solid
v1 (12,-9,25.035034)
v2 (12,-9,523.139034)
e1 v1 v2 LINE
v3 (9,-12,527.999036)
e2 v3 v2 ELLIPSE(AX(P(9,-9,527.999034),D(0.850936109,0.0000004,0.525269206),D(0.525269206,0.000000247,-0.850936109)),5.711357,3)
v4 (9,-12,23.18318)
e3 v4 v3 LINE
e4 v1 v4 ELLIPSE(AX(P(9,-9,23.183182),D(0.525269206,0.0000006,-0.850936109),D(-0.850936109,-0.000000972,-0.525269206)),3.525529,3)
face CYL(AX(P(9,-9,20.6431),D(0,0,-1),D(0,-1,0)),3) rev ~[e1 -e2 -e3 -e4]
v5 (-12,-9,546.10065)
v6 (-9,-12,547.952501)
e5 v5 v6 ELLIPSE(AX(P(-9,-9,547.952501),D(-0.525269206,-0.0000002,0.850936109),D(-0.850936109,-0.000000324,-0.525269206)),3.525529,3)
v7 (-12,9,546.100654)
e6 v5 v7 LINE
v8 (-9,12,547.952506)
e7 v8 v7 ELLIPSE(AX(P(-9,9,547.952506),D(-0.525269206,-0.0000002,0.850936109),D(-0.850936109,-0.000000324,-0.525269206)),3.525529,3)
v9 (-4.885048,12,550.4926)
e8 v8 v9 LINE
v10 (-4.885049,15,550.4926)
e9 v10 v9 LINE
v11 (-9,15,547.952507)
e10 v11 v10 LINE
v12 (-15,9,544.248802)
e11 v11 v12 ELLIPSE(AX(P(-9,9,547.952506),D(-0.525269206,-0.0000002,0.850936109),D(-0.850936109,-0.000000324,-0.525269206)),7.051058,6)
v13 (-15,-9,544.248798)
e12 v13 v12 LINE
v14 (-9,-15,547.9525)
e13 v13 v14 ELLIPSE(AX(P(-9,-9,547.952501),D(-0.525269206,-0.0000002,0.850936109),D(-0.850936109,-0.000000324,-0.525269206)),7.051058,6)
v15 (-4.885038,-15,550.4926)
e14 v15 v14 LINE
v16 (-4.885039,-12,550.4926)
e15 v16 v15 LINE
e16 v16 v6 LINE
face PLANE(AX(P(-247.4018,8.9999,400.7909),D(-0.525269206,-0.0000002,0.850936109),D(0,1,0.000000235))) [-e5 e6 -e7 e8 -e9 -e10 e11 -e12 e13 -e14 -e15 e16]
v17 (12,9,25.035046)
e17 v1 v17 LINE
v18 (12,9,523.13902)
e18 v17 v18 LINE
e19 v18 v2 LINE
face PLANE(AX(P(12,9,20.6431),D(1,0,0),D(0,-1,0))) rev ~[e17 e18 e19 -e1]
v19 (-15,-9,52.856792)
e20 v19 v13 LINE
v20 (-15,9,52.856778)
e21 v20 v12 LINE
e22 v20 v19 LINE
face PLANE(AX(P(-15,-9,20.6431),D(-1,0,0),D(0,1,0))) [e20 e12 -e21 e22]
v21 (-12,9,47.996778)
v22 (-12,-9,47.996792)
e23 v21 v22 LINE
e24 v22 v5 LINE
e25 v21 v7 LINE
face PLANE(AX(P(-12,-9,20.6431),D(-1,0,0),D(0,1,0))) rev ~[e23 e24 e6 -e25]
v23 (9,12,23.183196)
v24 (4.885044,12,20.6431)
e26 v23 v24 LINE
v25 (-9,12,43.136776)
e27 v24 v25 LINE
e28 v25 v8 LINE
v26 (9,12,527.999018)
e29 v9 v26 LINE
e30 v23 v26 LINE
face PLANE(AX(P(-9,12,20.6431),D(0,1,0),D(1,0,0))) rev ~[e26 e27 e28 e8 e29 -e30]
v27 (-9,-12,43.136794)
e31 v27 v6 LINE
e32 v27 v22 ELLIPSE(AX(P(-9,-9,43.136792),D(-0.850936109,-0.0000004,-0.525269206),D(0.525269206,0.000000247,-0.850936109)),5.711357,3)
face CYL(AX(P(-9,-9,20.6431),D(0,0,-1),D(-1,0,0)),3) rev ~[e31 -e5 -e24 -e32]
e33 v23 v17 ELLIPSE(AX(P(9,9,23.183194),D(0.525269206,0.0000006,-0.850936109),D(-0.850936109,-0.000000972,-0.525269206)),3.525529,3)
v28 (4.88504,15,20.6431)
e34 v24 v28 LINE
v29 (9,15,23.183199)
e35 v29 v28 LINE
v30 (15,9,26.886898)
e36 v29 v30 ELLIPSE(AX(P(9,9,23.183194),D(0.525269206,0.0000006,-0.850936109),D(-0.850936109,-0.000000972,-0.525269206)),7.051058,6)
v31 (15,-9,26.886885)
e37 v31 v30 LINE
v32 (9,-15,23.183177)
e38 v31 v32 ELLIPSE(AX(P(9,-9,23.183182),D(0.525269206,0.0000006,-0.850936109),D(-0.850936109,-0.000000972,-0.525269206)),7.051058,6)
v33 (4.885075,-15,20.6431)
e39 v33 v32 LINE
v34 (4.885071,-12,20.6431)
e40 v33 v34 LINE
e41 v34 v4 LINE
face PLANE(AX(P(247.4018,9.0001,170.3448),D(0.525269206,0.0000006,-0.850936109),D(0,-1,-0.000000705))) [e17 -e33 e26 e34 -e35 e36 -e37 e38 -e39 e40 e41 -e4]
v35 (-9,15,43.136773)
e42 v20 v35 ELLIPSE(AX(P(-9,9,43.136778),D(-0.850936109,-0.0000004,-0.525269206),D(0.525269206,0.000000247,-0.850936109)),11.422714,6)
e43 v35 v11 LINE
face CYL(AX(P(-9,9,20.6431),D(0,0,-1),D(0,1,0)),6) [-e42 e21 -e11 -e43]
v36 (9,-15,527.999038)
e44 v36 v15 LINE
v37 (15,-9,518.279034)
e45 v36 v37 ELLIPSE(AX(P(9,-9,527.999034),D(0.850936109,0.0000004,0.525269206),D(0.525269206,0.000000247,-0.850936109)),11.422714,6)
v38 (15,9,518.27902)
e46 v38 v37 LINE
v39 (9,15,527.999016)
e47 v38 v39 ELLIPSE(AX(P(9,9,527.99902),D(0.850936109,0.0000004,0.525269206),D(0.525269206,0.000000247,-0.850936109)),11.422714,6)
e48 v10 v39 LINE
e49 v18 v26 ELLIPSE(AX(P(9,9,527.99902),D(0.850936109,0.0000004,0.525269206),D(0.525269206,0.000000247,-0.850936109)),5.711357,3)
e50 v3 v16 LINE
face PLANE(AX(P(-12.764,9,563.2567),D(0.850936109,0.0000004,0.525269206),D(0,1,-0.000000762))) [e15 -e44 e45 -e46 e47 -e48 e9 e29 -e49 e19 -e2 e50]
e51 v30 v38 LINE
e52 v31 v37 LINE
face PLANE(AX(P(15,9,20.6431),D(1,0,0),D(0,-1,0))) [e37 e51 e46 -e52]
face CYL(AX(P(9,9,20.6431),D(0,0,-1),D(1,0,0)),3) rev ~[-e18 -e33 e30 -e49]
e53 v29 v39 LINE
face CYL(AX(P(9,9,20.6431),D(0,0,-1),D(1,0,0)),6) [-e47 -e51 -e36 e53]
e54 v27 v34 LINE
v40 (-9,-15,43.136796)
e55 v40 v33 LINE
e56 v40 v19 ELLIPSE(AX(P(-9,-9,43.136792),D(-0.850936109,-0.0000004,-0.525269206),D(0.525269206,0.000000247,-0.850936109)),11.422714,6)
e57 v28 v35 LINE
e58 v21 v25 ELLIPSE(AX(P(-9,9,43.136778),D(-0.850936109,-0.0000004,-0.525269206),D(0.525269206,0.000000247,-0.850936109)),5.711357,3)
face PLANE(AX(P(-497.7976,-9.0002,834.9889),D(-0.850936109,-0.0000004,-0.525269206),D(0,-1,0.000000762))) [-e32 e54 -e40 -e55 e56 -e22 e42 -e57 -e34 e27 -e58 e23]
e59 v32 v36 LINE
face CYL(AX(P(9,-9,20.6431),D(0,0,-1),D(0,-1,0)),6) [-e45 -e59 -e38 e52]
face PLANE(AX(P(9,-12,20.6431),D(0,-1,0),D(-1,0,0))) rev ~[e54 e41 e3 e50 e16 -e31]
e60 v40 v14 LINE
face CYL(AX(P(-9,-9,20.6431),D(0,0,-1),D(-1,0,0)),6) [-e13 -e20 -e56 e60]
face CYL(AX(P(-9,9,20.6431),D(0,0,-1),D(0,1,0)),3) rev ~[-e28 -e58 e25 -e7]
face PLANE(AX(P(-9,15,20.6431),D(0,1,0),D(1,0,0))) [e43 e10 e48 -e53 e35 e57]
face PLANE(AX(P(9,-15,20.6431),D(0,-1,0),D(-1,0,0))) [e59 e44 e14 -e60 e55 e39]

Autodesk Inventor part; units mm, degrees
ref_plane "Start Plane" through (0, 0, 20.6431) normal (0, 0, 1) x (1, 0, 0)
ref_plane "End Plane" through (0, 0, 550.4926) normal (0, 0, 1) x (1, 0, 0)
sketch "Sketch" plane through (0, 0, 0) normal (0, 0, 1) x (1, 0, 0)
  line L0 (-15, -9) -> (-15, 9)
  line L1 (-9, 15) -> (9, 15)
  line L2 (15, 9) -> (15, -9)
  line L3 (9, -15) -> (-9, -15)
  arc A0 (-15, -9) -> (-9, -15) centre (-9, -9) ccw
  arc A1 (-9, 15) -> (-15, 9) centre (-9, 9) ccw
  arc A2 (15, 9) -> (9, 15) centre (9, 9) ccw
  arc A3 (9, -15) -> (15, -9) centre (9, -9) ccw
  arc A4 (-9, 12) -> (-12, 9) centre (-9, 9) ccw
  line L4 (-9, 12) -> (9, 12)
  arc A5 (12, 9) -> (9, 12) centre (9, 9) ccw
  line L5 (12, 9) -> (12, -9)
  arc A6 (9, -12) -> (12, -9) centre (9, -9) ccw
  line L6 (9, -12) -> (-9, -12)
  arc A7 (-12, -9) -> (-9, -12) centre (-9, -9) ccw
  line L7 (-12, -9) -> (-12, 9)
  line L8 (0, 22.7397) -> (0, -22.7397) construction
  line L9 (-22.7397, 0) -> (22.7397, 0) construction
  dimension "d7" = 6
  dimension "d10" = 30
  dimension "d11" = 30
  dimension "d12" = 3
  dimension "d15" = 15
  dimension "d16" = 15
extrude "Body" add sketch "Sketch" along normal up to surface (529.8495 mm away) from surface at 20.6431
sketch "Sketch3" plane through (0, 0, 0) normal (0, 0, 1) x (1, 0, 0)
  line L0 (0, 0) -> (10, 0)
ref_plane "Work Plane3" through (0, 0, 0) normal (0, -1, 0) x (1, 0, 0)
ref_plane "Work Plane4" through (247.4018, 9.0001, 170.3448) normal (0.5252692, 0.0000006, -0.8509361) x (-0.8509361, -0.0000022, -0.5252692)
split "Split1" plane through (247.4018, 9.0001, 170.3448) removes the side toward (0.5252692, 0.0000006, -0.8509361)
ref_plane "Work Plane5" through (-497.7976, -9.0002, 834.9889) normal (-0.8509361, -0.0000004, -0.5252692) x (-0.5252692, -0.0000006, 0.8509361)
split "Split2" plane through (-497.7976, -9.0002, 834.9889) removes the side toward (-0.8509361, -0.0000004, -0.5252692)
ref_plane "Work Plane6" through (-247.4018, 8.9999, 400.7909) normal (-0.5252692, -0.0000002, 0.8509361) x (0.8509361, -0.0000001, 0.5252692)
split "Split3" plane through (-247.4018, 8.9999, 400.7909) removes the side toward (-0.5252692, -0.0000002, 0.8509361)
ref_plane "Work Plane7" through (-12.764, 9, 563.2567) normal (0.8509361, 0.0000004, 0.5252692) x (0.5252692, -0.0000002, -0.8509361)
split "Split4" plane through (-12.764, 9, 563.2567) removes the side toward (0.8509361, 0.0000004, 0.5252692)
sketch "Sketch4" plane through (0, 0, 0) normal (0, -1, 0) x (1, 0, 0)
  line L0 (-2, 20.6431) -> (12, 20.6431) projected
  line L1 (-2, 550.4926) -> (12, 550.4926) projected
  dimension "d18" = 529.8495
equation "\"d7\" = G_IR"
equation "\"d10\" = G_H"
equation "\"d11\" = G_W"
equation "\"d12\" = G_T"
equation "\"d15\" = 0.5 * d10"
equation "\"d16\" = 0.5 * d11"
equation "\"d3\" = G_L"
equation "\"G_W\" = 30"
equation "\"G_H\" = 30"
equation "\"G_T\" = 3"
equation "\"G_IR\" = 6"
equation "\"G_L\" = d18"
equation "\"G_OFFSET_START\" = -20.64308"
equation "\"G_OFFSET_END\" = -20.64307"
equation "\"d13\" = -G_OFFSET_START"
equation "\"d14\" = G_OFFSET_END + B_L"
equation "\"B_L\" = 571.1357"
properties part number "DIN EN 10219-2 - 30 x 30 x 3  - 529.85" material "Steel, Mild"
